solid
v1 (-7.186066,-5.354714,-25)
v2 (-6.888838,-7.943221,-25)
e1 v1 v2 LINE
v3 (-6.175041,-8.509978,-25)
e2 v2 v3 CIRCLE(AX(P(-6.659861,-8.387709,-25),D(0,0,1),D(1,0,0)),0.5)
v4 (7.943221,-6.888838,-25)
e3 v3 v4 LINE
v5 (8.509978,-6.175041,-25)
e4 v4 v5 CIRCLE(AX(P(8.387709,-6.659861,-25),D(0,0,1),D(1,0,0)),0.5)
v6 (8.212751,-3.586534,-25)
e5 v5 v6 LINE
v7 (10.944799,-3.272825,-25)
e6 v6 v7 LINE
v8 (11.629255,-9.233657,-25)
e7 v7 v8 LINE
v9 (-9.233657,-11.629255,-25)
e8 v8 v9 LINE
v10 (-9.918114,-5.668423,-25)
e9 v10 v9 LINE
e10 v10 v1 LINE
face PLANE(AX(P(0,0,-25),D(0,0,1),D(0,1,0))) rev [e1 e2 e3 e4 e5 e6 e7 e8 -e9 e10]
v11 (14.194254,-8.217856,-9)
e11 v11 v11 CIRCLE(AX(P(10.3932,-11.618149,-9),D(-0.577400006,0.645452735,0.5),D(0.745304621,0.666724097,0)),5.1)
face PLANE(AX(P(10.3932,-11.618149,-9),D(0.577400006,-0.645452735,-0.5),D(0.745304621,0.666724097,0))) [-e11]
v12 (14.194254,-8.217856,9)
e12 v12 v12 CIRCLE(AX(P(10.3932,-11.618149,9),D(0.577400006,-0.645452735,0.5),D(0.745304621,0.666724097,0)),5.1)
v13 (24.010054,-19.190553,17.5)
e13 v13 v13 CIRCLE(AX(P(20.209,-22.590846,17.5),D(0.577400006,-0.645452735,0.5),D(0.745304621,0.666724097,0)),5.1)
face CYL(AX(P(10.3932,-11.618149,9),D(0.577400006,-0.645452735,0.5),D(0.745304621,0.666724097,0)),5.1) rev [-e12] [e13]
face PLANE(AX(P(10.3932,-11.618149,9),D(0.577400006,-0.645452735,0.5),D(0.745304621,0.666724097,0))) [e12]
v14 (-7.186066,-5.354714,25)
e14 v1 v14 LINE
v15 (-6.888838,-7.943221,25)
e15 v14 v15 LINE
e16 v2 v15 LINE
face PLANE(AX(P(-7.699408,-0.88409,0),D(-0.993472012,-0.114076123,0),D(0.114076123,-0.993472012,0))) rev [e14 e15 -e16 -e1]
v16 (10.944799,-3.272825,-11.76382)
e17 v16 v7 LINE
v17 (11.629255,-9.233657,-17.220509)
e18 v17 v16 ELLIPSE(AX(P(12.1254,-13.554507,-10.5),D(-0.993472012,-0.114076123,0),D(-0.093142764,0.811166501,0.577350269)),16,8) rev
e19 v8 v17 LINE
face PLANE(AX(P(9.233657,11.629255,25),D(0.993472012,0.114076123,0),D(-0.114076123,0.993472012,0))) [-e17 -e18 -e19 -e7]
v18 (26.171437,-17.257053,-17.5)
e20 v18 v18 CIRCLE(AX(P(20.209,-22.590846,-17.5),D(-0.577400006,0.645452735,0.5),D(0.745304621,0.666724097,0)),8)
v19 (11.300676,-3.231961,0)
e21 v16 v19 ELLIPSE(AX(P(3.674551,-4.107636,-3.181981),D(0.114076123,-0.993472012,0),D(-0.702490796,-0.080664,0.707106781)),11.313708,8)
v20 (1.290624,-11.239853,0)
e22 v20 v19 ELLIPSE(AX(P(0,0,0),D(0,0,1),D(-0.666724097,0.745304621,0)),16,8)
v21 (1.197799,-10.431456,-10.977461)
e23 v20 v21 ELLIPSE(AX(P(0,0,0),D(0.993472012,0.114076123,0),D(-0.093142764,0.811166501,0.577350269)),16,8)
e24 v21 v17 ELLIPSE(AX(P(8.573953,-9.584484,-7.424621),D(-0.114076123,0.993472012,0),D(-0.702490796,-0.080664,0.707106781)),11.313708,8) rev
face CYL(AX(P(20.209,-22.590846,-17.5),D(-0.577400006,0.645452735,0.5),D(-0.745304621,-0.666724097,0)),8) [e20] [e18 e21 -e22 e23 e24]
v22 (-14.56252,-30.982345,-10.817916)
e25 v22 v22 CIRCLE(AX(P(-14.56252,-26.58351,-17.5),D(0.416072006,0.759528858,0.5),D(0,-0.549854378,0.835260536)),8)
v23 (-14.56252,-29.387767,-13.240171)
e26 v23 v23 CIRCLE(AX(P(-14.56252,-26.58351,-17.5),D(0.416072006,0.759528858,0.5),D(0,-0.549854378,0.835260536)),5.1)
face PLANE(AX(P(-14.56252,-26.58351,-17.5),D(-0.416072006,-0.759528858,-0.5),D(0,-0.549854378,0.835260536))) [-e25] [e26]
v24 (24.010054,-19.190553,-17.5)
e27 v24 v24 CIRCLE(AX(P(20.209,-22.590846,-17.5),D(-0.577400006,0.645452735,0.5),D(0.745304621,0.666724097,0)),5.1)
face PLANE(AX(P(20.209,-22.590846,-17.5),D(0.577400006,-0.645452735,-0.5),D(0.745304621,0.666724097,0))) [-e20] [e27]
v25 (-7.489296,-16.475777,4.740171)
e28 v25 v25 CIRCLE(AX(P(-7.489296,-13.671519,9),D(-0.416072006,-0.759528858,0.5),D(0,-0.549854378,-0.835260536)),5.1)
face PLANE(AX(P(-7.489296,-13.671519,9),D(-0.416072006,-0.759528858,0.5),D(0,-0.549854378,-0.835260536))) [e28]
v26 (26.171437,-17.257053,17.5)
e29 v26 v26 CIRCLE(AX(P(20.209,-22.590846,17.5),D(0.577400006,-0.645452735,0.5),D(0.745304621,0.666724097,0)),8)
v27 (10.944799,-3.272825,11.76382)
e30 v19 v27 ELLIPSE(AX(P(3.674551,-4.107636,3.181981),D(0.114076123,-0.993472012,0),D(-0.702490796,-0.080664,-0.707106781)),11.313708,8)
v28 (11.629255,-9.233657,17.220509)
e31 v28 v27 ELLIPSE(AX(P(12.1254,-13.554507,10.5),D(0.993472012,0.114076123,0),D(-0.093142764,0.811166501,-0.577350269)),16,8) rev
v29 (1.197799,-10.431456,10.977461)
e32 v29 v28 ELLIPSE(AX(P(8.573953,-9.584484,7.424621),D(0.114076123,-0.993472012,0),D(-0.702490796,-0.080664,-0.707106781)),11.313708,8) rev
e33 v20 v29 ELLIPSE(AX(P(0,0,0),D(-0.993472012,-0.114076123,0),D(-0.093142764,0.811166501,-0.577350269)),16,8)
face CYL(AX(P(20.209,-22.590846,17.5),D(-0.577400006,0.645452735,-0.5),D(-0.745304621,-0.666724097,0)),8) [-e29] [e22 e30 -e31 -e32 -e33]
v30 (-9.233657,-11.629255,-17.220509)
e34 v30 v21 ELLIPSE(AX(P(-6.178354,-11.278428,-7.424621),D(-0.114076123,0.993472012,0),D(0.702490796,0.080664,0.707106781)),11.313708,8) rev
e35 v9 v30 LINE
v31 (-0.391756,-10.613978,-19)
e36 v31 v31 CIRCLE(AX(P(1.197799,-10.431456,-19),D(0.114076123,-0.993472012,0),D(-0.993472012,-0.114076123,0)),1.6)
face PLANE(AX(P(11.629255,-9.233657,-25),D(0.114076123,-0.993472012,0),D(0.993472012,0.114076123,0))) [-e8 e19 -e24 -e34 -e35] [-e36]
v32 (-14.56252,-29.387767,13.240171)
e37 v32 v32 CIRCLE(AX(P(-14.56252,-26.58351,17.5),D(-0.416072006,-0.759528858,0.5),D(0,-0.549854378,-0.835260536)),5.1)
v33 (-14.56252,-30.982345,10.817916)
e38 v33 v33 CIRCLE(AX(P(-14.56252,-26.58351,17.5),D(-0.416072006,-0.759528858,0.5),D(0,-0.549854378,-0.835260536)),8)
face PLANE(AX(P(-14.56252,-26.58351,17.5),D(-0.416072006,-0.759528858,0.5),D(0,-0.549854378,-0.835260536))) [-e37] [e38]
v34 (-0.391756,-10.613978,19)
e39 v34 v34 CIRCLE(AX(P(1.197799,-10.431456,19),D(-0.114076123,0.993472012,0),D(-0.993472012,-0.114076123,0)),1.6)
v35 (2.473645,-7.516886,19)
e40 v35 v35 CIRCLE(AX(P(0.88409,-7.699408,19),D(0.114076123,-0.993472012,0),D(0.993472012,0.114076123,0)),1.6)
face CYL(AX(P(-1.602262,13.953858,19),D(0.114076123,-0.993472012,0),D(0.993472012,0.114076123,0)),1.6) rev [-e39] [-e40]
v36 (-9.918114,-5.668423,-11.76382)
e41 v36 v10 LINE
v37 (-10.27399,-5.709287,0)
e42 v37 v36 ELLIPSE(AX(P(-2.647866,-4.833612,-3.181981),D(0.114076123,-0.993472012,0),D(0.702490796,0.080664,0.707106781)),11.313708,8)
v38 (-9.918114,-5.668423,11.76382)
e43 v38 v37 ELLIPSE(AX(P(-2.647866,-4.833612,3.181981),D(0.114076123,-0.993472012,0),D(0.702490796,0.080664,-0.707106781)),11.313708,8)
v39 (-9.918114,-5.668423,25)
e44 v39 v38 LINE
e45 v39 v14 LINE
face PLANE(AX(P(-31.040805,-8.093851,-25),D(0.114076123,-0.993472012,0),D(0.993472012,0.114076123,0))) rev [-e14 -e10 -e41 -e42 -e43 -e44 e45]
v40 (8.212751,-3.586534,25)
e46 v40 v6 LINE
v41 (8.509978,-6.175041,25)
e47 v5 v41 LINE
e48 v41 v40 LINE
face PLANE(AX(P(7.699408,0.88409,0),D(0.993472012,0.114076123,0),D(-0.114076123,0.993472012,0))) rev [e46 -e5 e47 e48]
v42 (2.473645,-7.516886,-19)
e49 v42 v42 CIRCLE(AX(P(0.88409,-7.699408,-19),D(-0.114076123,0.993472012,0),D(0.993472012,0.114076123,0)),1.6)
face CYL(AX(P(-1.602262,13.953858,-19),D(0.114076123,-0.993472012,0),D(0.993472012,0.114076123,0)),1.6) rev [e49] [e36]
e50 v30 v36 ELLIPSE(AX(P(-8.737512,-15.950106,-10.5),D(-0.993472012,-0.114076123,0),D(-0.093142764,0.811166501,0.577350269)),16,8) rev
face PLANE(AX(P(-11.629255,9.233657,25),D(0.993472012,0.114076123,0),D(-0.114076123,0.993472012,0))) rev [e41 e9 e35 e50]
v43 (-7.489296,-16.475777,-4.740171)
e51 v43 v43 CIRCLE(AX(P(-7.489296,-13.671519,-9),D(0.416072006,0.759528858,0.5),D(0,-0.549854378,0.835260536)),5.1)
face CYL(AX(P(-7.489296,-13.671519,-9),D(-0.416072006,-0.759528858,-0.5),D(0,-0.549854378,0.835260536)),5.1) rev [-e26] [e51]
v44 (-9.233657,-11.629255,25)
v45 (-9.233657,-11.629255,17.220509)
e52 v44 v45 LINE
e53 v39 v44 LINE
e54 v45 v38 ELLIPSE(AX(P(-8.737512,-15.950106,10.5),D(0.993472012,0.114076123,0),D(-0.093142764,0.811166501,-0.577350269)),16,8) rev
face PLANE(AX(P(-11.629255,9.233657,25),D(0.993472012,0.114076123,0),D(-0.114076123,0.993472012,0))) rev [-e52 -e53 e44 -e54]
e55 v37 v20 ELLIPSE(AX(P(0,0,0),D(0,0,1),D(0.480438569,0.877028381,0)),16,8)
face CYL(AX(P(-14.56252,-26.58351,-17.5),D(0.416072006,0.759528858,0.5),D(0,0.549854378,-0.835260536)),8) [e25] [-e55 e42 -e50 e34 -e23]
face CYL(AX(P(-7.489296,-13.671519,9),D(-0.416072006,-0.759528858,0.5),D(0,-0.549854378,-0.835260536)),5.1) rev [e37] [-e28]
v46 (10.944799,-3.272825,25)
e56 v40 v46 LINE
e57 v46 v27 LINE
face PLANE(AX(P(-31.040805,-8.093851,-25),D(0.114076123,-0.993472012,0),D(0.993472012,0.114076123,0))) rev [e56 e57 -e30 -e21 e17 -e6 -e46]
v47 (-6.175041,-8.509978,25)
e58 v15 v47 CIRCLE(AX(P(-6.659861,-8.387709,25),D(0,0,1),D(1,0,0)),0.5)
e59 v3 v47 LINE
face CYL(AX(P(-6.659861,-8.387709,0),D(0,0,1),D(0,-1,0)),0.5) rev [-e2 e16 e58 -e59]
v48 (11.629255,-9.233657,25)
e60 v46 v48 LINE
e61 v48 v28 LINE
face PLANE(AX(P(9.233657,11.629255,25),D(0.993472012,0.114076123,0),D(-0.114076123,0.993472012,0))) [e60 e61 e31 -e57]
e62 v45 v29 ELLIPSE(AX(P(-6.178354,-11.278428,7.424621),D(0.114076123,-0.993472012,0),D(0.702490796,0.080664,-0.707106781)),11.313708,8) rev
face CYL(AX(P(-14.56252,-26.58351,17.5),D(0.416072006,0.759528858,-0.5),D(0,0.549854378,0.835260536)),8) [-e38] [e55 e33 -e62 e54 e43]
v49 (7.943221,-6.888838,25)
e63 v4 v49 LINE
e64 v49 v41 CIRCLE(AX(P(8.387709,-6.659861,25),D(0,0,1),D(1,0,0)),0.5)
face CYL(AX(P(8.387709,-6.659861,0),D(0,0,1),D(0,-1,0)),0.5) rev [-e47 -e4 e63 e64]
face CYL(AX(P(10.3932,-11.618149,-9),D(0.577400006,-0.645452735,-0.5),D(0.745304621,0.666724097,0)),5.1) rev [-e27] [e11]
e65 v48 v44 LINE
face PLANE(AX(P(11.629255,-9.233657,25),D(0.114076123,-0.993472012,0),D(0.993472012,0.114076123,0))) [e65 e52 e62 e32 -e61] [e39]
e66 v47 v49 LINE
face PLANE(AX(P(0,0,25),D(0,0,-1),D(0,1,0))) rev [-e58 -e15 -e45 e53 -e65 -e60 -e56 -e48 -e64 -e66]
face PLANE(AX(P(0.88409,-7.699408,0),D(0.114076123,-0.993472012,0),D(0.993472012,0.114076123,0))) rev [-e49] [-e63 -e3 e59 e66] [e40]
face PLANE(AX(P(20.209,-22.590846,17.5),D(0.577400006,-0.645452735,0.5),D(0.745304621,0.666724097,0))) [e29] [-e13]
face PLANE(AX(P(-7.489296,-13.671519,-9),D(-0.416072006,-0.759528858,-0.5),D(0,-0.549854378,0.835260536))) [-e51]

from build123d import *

# Parameters (mm, degrees)
BOSS_EXTRUDE1_DEPTH = 25
SKETCH5_R           = 8
BOSS_EXTRUDE2_DEPTH = 35
SKETCH6_R           = 8
BOSS_EXTRUDE3_DEPTH = 35
CUT_EXTRUDE1_DEPTH  = 35
SKETCH9_R           = 5.1
CUT_EXTRUDE2_DEPTH  = 17
SKETCH10_R          = 5.1
CUT_EXTRUDE3_DEPTH  = 17
SKETCH11_R          = 0.5
CUT_EXTRUDE4_DEPTH  = 49.48192396
CUT_EXTRUDE5_REACH  = 44.001
SKETCH12_R          = 1.6
CUT_EXTRUDE7_DEPTH  = 66.003822587


# Read off the part's stored shape, not the designer's step: Mirror1
with BuildPart() as part:
    # Sketch3 → Boss-Extrude1 (new body)
    with BuildSketch(Plane(origin=(0, 0, 0), x_dir=(-0.9678879191476432, 0.2513821313618881, 0), z_dir=(0, 0, 1))):
        Polygon((-6.013757892, -13.576992157), (13.576992157, -6.013757892), (6.013757892, 13.576992157), (-13.576992157, 6.013757892), align=None)
    extrude(amount=BOSS_EXTRUDE1_DEPTH)

    # Sketch5 → Boss-Extrude2 (add)
    with BuildSketch(Plane(origin=(0, 0, 0), x_dir=(-0.6605627762289513, -0.729230336843708, -0.17854952950795708), z_dir=(0.5774000057119382, -0.6454527352206789, 0.499999999999998))):
        with Locations(Location((0, 0, 0), (0, 0, 168.101929209))):
            Circle(SKETCH5_R)
    extrude(amount=BOSS_EXTRUDE2_DEPTH)

    # Sketch6 → Boss-Extrude3 (add)
    with BuildSketch(Plane(origin=(0, 0, 0), x_dir=(-0.7035639492311271, 0.6172392366079582, 0.3521554970945721), z_dir=(-0.4160720061092846, -0.7595288577349762, 0.499999999999998))):
        with Locations(Location((0, 0, 0), (0, 0, 312.286757046))):
            Circle(SKETCH6_R)
    extrude(amount=BOSS_EXTRUDE3_DEPTH)

    # Sketch8 → Cut-Extrude1 (cut)
    with BuildSketch(Plane(origin=(0, 0, 0), x_dir=(-0.9678879191476432, 0.2513821313618881, 0), z_dir=(0, 0, 1))):
        Polygon((-36.845563498, -70.986857451), (-76.079837432, 33.240527854), (43.363854901, 78.202670298), (82.598128835, -26.024715007), align=None)
    extrude(amount=-CUT_EXTRUDE1_DEPTH, mode=Mode.SUBTRACT)

    # Sketch9 → Cut-Extrude2 (cut)
    with BuildSketch(Plane(origin=(20.2090002, -22.590845733, 17.5), x_dir=(0.6605627762289512, 0.7292303368437081, 0.1785495295079571), z_dir=(0.5774000057119382, -0.6454527352206788, 0.499999999999998))):
        with Locations(Location((0, 0, 0), (0, 0, 348.101929209))):
            Circle(SKETCH9_R)
    extrude(amount=-CUT_EXTRUDE2_DEPTH, mode=Mode.SUBTRACT)

    # Sketch10 → Cut-Extrude3 (cut)
    with BuildSketch(Plane(origin=(-14.562520214, -26.583510021, 17.5), x_dir=(-0.7035639492311272, 0.6172392366079582, 0.352155497094572), z_dir=(-0.41607200610928446, -0.7595288577349761, 0.499999999999998))):
        with Locations(Location((0, 0, 0), (0, 0, 129.311285717))):
            Circle(SKETCH10_R)
    extrude(amount=-CUT_EXTRUDE3_DEPTH, mode=Mode.SUBTRACT)

    # Sketch11 → Cut-Extrude4 (cut, through all)
    with BuildSketch(Plane(origin=(0, 0, 25), x_dir=(0.967887919147643, -0.25138213136188803, 0), z_dir=(0, 0, 1))):
        with BuildLine():
            ThreePointArc((-3.837479182, -9.792532706), (-3.837482303, -9.790766245), (-3.837491664, -9.788999807))
            Line((-3.837491664, -9.788999807), (-4.438726063, -10.021113258))
            Line((-4.438726063, -10.021113258), (-4.670839514, -9.419878859))
            ThreePointArc((-4.670839514, -9.419878859), (-4.541586794, -10.248975564), (-3.837479182, -9.792532706))
        make_face()
        with BuildLine():
            Line((-4.438726063, -10.021113258), (-3.837491664, -9.788999807))
            ThreePointArc((-3.837491664, -9.788999807), (-4.134985421, -9.3353716), (-4.670839514, -9.419878859))
            Line((-4.670839514, -9.419878859), (-4.438726063, -10.021113258))
        make_face()
        with BuildLine():
            Line((9.419878859, -4.670839514), (10.021113258, -4.438726063))
            Line((10.021113258, -4.438726063), (9.788999807, -3.837491664))
            ThreePointArc((9.788999807, -3.837491664), (9.3353716, -4.134985421), (9.419878859, -4.670839514))
        make_face()
        with BuildLine():
            Line((9.788999807, -3.837491664), (10.021113258, -4.438726063))
            Line((10.021113258, -4.438726063), (9.419878859, -4.670839514))
            ThreePointArc((9.419878859, -4.670839514), (9.97096067, -4.804558899), (10.292532706, -4.337479182))
            ThreePointArc((10.292532706, -4.337479182), (10.144834814, -3.982678922), (9.788999807, -3.837491664))
        make_face()
        with Locations((-4.337479182, -9.792532706)):
            Circle(SKETCH11_R)
        with Locations((9.792532706, -4.337479182)):
            Circle(SKETCH11_R)
        Polygon((-4.438726063, -10.021113258), (10.021113258, -4.438726063), (4.438726063, 10.021113258), (-10.021113258, 4.438726063), align=None)
    extrude(amount=-CUT_EXTRUDE4_DEPTH, mode=Mode.SUBTRACT)

    # Sketch12 → Cut-Extrude5 (cut, up to next)
    with BuildSketch(Plane(origin=(1.197799286, -10.431456124, 0), x_dir=(0.07381782244775265, 0.008476183382208579, -0.9972357210832067), z_dir=(-0.11407612251429676, 0.9934720118212205, 0)), mode=Mode.PRIVATE) as cut_extrude5_sk1:
        with Locations(Location((-18.947478701, -1.411754543, 0), (0, 0, 274.261167974))):
            Circle(SKETCH12_R)
    cut_extrude5_tool1 = extrude(cut_extrude5_sk1.sketch, amount=CUT_EXTRUDE5_REACH, mode=Mode.PRIVATE) & part.part
    add(cut_extrude5_tool1.solids().sort_by_distance((1.197799, -10.431456, 19))[0], mode=Mode.SUBTRACT)

    # Mirror1: part across plane


with BuildPart() as part_1:
    add(part.part)
    add(part.part.mirror(Plane.XY))

    # Sketch14 → Cut-Extrude7 (cut, through all)
    with BuildSketch(Plane.XY.offset(25)):
        Polygon((-31.040805359, -8.093851281), (38.274007484, -0.134729143), (36.078976394, 18.981470679), (-33.745248602, 10.963854933), align=None)
    extrude(amount=-CUT_EXTRUDE7_DEPTH, mode=Mode.SUBTRACT)


solid = part_1.part
